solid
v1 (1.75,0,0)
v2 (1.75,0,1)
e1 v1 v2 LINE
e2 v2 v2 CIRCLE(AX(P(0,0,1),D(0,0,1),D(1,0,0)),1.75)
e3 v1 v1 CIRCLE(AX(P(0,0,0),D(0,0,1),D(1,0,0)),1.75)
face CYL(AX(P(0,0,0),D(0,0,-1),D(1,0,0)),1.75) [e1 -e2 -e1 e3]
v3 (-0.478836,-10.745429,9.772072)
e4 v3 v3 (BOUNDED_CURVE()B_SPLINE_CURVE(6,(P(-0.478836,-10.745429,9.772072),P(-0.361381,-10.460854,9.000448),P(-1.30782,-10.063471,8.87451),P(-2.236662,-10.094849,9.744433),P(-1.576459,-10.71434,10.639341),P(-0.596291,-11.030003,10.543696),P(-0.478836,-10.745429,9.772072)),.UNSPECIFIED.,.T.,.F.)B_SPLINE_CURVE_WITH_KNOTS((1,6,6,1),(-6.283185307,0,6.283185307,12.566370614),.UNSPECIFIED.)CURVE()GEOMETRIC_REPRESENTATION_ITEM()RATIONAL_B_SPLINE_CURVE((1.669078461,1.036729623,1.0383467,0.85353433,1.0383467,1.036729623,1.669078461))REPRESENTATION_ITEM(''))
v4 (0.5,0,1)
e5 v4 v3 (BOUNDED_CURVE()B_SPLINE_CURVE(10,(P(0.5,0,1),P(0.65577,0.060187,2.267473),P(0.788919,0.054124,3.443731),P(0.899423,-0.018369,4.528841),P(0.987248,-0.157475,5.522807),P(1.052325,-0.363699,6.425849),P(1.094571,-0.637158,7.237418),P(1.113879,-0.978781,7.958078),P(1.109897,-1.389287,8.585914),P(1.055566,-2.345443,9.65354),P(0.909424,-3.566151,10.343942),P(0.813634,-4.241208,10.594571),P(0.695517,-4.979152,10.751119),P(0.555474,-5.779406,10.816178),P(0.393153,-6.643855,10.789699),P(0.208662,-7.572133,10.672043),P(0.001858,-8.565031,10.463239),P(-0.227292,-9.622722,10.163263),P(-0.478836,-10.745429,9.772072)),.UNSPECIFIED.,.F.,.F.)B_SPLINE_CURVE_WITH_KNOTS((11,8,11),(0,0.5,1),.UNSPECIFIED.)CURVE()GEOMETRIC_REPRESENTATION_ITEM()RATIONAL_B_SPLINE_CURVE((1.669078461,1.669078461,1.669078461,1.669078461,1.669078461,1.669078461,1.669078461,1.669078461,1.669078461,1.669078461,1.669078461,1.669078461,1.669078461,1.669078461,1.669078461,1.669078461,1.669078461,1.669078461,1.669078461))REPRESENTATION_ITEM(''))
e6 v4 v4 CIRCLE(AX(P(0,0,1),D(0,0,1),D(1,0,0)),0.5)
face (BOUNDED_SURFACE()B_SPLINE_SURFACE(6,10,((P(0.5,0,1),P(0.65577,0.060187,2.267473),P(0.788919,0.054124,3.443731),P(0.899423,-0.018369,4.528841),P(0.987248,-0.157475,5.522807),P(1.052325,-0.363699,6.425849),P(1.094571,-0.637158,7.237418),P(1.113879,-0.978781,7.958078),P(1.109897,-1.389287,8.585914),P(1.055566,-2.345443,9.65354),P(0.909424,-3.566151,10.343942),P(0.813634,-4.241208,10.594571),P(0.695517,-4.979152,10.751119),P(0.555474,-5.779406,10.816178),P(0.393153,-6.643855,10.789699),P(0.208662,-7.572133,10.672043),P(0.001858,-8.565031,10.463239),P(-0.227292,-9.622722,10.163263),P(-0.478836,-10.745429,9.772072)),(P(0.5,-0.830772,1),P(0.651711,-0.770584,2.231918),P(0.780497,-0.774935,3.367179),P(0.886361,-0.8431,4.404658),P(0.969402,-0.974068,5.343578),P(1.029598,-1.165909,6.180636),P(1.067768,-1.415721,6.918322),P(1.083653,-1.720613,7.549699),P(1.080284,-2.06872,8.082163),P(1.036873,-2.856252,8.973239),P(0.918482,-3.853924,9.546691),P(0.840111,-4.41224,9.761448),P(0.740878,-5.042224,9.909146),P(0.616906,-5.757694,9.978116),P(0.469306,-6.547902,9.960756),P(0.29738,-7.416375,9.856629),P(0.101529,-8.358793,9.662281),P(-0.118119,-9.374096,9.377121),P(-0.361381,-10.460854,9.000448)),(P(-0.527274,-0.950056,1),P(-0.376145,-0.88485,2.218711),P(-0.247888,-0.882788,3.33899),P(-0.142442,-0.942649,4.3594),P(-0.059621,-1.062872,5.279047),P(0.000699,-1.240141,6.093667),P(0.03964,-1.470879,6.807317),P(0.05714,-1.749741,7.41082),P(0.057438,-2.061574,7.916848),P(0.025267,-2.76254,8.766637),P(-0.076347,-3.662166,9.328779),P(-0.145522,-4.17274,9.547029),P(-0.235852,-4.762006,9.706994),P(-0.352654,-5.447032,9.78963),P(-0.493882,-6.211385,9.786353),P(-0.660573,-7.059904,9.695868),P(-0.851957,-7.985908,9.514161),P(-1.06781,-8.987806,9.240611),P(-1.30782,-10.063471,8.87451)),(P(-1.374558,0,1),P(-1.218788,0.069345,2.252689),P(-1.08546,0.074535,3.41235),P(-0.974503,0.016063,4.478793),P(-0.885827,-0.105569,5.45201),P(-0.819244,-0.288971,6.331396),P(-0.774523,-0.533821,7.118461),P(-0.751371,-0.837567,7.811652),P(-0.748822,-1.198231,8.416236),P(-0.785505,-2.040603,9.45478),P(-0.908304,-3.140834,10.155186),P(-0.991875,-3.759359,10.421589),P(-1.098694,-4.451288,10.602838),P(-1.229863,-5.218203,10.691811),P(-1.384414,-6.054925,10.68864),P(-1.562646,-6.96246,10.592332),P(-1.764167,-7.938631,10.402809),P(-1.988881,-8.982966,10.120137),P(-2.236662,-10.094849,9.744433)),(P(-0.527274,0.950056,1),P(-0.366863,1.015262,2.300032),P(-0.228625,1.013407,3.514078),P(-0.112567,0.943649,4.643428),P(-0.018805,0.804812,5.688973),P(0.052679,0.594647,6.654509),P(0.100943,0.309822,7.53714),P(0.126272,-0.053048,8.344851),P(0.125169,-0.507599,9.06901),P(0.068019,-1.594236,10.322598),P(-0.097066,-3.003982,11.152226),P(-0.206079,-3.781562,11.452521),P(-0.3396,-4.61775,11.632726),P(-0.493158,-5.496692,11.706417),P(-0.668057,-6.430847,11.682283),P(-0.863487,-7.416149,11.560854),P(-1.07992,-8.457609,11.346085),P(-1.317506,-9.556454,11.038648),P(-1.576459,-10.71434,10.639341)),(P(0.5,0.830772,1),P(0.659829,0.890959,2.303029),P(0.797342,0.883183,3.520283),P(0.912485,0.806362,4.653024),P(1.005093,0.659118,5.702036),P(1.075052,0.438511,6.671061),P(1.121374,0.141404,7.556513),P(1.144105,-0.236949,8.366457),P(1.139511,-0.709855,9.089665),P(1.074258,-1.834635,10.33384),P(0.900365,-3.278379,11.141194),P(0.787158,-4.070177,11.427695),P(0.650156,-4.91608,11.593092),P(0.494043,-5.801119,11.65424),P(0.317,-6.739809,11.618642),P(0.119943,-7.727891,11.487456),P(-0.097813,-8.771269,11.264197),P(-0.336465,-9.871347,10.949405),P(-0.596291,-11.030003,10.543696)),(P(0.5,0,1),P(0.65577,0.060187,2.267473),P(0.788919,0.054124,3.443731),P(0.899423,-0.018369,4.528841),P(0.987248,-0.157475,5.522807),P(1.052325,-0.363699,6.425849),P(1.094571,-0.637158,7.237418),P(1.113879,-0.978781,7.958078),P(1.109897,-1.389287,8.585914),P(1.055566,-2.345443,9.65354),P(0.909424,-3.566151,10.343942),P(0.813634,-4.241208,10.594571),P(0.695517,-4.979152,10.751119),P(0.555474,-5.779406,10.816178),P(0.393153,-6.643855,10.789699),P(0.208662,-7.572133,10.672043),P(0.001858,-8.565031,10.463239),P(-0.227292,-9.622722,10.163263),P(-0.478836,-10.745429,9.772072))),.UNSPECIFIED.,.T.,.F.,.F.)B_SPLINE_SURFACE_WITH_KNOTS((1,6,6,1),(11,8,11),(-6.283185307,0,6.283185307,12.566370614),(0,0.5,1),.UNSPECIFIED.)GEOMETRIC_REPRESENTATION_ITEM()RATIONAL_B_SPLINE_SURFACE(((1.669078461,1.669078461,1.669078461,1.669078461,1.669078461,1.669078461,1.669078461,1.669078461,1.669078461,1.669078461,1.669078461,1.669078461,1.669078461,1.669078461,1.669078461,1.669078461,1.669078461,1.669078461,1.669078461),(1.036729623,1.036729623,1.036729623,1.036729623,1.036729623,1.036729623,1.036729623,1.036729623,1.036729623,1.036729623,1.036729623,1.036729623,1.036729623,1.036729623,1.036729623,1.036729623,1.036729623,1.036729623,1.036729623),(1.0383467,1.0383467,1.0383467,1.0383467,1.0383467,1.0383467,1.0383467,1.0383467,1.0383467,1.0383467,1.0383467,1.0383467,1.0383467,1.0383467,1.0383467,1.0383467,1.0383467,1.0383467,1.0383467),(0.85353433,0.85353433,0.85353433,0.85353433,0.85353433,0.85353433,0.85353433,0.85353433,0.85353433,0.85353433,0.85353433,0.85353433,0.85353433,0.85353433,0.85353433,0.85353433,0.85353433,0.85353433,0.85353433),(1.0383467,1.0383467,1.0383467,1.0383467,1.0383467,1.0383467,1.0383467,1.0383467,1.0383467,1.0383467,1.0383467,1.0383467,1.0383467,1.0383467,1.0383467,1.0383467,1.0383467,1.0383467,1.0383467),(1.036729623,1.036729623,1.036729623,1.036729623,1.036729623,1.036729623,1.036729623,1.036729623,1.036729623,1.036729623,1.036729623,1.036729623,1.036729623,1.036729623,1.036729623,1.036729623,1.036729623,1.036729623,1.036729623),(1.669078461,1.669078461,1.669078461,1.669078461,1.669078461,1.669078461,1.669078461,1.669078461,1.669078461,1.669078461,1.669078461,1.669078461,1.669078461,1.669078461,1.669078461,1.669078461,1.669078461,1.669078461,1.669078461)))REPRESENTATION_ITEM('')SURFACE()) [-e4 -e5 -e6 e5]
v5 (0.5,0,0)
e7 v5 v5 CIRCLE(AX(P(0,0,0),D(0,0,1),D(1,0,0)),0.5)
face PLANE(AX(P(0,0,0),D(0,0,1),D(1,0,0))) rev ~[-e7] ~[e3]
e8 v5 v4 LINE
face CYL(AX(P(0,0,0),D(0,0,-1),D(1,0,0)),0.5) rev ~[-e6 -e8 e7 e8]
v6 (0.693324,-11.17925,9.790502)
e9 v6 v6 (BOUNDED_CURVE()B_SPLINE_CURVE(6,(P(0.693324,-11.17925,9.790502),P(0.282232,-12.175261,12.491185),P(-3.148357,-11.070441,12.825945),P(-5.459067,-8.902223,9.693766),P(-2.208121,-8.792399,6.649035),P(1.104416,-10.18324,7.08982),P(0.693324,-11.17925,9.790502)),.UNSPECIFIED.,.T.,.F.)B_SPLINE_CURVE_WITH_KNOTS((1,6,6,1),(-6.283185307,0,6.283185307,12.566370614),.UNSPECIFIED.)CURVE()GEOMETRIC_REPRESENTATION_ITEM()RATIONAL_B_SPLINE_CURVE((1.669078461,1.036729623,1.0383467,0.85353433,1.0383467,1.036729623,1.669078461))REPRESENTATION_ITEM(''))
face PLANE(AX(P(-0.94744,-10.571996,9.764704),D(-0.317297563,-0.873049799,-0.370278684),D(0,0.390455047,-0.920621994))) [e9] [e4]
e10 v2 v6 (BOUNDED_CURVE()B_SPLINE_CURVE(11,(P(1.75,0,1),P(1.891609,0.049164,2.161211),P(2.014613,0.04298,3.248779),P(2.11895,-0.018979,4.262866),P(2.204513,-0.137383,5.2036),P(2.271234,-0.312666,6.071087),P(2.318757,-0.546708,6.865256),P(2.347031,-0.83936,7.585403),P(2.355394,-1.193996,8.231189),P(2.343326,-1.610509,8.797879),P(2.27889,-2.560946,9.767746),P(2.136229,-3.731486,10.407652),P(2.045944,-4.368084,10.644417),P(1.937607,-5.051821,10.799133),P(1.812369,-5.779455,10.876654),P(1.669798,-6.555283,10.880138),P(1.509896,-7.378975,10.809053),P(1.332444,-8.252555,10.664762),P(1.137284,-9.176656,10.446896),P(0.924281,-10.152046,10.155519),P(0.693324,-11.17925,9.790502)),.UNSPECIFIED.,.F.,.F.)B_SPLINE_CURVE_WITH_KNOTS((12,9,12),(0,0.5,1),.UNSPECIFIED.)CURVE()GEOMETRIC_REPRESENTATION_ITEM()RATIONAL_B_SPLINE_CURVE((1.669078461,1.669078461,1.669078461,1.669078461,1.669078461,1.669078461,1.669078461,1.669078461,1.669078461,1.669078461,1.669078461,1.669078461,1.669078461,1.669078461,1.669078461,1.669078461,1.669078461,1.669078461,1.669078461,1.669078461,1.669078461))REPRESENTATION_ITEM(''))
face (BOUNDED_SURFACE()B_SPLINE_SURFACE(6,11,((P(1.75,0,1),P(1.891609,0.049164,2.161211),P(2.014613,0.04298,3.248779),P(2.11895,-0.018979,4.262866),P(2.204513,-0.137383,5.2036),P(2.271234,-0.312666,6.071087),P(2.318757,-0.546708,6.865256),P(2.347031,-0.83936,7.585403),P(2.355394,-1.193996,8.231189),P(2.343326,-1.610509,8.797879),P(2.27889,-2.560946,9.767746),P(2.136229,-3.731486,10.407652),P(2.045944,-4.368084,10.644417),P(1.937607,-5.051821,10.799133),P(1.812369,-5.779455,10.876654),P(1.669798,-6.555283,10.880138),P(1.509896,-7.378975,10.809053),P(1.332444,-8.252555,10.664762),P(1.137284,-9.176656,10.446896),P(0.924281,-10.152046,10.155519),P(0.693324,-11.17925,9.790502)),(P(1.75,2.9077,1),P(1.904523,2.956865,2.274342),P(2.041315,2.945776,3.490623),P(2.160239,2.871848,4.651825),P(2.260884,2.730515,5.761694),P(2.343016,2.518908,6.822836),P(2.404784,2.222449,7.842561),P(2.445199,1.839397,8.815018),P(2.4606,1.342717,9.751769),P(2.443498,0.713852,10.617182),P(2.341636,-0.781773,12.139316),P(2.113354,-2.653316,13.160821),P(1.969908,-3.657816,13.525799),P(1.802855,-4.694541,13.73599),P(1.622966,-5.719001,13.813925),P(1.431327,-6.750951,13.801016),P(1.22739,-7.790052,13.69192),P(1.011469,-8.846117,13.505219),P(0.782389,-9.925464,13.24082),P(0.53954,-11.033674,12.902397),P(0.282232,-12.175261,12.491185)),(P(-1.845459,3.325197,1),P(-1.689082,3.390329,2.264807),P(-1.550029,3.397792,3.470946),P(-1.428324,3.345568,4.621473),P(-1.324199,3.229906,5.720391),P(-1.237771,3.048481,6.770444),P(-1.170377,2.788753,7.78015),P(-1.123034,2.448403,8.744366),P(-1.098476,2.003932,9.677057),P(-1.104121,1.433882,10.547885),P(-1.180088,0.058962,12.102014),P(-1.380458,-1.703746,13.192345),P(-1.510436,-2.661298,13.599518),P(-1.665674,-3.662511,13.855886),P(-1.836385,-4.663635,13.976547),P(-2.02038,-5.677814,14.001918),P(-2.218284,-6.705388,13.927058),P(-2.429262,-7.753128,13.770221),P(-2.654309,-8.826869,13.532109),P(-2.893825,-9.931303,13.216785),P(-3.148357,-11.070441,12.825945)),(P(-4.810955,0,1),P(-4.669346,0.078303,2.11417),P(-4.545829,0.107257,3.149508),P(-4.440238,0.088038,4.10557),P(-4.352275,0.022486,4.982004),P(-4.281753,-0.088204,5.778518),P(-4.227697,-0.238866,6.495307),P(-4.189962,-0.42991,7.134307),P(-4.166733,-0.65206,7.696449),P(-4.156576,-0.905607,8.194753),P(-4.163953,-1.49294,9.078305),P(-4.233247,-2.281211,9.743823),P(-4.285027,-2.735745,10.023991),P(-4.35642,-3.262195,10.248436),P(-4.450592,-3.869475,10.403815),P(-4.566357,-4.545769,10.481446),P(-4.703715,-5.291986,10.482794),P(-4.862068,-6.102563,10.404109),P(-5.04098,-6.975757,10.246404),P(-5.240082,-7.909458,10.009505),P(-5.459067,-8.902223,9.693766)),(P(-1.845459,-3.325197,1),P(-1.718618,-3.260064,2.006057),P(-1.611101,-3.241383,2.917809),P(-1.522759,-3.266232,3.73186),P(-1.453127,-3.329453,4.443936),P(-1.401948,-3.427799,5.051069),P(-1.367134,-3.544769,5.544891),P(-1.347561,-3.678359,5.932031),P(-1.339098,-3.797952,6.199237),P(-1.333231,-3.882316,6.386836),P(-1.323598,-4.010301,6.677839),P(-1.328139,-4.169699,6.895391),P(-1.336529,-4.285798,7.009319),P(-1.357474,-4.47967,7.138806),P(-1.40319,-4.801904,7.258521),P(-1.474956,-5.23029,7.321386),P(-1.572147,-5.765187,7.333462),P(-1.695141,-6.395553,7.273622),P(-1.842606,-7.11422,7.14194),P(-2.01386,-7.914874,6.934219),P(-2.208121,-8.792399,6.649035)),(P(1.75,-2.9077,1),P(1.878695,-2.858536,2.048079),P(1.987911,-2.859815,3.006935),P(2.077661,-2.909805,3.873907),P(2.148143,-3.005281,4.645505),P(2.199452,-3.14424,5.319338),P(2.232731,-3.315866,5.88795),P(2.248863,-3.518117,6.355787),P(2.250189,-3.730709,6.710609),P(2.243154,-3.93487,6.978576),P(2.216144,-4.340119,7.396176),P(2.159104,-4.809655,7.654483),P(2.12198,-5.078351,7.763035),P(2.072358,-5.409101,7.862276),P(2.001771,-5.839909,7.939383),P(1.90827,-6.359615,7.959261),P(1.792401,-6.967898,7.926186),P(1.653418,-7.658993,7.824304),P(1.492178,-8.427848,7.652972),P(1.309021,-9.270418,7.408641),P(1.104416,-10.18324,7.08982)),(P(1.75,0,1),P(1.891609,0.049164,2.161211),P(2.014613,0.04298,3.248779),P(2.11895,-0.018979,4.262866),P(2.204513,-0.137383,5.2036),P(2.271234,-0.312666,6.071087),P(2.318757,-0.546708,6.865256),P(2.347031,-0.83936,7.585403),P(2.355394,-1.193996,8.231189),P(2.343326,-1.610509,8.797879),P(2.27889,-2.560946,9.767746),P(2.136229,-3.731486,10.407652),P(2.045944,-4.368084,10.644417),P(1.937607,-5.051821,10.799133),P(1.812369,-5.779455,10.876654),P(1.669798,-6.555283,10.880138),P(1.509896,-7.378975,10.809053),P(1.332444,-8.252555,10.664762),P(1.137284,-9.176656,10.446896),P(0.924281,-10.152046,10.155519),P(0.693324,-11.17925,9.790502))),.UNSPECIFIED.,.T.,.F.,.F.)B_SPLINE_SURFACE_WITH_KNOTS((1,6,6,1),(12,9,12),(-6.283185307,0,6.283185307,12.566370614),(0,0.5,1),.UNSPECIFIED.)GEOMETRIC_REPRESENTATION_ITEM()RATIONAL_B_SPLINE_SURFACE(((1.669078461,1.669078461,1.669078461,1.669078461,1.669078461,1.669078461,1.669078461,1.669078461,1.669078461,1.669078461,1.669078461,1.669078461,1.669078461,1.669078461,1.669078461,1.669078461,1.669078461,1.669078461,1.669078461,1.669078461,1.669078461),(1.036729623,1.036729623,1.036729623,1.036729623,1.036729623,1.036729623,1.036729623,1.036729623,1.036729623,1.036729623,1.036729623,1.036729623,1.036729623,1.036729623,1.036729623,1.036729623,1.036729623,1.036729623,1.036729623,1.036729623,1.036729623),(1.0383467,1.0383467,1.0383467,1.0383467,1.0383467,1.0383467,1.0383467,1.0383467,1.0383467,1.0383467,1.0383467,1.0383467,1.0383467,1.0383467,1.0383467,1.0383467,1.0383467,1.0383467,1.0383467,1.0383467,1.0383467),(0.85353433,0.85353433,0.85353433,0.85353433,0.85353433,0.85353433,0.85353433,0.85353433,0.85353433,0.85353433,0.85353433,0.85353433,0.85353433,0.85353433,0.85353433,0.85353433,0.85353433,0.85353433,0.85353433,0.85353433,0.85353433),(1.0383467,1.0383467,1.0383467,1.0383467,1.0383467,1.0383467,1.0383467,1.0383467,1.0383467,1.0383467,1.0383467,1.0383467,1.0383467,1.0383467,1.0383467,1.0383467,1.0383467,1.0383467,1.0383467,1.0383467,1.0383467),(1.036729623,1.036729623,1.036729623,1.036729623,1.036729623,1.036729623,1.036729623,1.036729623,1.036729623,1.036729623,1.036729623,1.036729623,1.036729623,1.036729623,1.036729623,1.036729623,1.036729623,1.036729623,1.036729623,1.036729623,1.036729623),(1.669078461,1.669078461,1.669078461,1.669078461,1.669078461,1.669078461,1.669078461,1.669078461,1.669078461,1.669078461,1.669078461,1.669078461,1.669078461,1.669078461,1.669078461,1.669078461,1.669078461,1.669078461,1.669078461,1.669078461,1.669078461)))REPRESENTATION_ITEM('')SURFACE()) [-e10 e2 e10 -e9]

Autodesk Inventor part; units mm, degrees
ref_plane "YZ Plane" through (0, 0, 0) normal (1, 0, 0) x (0, 1, 0)
ref_plane "XZ Plane" through (0, 0, 0) normal (0, 1, 0) x (-1, 0, 0)
ref_plane "XY Plane" through (0, 0, 0) normal (0, 0, 1) x (1, 0, 0)
sketch "Sketch1" plane through (0, 0, 0) normal (0, 0, 1) x (1, 0, 0)
  circle A0 centre (0, 0) radius 1.75
  circle A1 centre (0, 0) radius 0.5
  dimension "d0" = 3.5
  dimension "d1" = 1
extrude "Extrusion1" add sketch "Sketch1" along normal blind 1
sketch "Sketch9" plane through (0, 0, 1) normal (0, 0, 1) x (1, 0, 0)
  circle A0 centre (0, 0) radius 0.5 projected
  circle A1 centre (0, 0) radius 1.75 projected
sketch3d "3D Sketch8"
  spline S0 degree 2 poles (0, 0, 1) (1.5577, 0.6263, 13.6353) (-0.9477, -10.5719, 9.7647) knots 0 0 0 1 1 1
sweep "Sweep9" add profiles "Sketch9" path "3D Sketch8"
properties part number "3d_LM - Tubo 1x1-2_pressuresensor2"
